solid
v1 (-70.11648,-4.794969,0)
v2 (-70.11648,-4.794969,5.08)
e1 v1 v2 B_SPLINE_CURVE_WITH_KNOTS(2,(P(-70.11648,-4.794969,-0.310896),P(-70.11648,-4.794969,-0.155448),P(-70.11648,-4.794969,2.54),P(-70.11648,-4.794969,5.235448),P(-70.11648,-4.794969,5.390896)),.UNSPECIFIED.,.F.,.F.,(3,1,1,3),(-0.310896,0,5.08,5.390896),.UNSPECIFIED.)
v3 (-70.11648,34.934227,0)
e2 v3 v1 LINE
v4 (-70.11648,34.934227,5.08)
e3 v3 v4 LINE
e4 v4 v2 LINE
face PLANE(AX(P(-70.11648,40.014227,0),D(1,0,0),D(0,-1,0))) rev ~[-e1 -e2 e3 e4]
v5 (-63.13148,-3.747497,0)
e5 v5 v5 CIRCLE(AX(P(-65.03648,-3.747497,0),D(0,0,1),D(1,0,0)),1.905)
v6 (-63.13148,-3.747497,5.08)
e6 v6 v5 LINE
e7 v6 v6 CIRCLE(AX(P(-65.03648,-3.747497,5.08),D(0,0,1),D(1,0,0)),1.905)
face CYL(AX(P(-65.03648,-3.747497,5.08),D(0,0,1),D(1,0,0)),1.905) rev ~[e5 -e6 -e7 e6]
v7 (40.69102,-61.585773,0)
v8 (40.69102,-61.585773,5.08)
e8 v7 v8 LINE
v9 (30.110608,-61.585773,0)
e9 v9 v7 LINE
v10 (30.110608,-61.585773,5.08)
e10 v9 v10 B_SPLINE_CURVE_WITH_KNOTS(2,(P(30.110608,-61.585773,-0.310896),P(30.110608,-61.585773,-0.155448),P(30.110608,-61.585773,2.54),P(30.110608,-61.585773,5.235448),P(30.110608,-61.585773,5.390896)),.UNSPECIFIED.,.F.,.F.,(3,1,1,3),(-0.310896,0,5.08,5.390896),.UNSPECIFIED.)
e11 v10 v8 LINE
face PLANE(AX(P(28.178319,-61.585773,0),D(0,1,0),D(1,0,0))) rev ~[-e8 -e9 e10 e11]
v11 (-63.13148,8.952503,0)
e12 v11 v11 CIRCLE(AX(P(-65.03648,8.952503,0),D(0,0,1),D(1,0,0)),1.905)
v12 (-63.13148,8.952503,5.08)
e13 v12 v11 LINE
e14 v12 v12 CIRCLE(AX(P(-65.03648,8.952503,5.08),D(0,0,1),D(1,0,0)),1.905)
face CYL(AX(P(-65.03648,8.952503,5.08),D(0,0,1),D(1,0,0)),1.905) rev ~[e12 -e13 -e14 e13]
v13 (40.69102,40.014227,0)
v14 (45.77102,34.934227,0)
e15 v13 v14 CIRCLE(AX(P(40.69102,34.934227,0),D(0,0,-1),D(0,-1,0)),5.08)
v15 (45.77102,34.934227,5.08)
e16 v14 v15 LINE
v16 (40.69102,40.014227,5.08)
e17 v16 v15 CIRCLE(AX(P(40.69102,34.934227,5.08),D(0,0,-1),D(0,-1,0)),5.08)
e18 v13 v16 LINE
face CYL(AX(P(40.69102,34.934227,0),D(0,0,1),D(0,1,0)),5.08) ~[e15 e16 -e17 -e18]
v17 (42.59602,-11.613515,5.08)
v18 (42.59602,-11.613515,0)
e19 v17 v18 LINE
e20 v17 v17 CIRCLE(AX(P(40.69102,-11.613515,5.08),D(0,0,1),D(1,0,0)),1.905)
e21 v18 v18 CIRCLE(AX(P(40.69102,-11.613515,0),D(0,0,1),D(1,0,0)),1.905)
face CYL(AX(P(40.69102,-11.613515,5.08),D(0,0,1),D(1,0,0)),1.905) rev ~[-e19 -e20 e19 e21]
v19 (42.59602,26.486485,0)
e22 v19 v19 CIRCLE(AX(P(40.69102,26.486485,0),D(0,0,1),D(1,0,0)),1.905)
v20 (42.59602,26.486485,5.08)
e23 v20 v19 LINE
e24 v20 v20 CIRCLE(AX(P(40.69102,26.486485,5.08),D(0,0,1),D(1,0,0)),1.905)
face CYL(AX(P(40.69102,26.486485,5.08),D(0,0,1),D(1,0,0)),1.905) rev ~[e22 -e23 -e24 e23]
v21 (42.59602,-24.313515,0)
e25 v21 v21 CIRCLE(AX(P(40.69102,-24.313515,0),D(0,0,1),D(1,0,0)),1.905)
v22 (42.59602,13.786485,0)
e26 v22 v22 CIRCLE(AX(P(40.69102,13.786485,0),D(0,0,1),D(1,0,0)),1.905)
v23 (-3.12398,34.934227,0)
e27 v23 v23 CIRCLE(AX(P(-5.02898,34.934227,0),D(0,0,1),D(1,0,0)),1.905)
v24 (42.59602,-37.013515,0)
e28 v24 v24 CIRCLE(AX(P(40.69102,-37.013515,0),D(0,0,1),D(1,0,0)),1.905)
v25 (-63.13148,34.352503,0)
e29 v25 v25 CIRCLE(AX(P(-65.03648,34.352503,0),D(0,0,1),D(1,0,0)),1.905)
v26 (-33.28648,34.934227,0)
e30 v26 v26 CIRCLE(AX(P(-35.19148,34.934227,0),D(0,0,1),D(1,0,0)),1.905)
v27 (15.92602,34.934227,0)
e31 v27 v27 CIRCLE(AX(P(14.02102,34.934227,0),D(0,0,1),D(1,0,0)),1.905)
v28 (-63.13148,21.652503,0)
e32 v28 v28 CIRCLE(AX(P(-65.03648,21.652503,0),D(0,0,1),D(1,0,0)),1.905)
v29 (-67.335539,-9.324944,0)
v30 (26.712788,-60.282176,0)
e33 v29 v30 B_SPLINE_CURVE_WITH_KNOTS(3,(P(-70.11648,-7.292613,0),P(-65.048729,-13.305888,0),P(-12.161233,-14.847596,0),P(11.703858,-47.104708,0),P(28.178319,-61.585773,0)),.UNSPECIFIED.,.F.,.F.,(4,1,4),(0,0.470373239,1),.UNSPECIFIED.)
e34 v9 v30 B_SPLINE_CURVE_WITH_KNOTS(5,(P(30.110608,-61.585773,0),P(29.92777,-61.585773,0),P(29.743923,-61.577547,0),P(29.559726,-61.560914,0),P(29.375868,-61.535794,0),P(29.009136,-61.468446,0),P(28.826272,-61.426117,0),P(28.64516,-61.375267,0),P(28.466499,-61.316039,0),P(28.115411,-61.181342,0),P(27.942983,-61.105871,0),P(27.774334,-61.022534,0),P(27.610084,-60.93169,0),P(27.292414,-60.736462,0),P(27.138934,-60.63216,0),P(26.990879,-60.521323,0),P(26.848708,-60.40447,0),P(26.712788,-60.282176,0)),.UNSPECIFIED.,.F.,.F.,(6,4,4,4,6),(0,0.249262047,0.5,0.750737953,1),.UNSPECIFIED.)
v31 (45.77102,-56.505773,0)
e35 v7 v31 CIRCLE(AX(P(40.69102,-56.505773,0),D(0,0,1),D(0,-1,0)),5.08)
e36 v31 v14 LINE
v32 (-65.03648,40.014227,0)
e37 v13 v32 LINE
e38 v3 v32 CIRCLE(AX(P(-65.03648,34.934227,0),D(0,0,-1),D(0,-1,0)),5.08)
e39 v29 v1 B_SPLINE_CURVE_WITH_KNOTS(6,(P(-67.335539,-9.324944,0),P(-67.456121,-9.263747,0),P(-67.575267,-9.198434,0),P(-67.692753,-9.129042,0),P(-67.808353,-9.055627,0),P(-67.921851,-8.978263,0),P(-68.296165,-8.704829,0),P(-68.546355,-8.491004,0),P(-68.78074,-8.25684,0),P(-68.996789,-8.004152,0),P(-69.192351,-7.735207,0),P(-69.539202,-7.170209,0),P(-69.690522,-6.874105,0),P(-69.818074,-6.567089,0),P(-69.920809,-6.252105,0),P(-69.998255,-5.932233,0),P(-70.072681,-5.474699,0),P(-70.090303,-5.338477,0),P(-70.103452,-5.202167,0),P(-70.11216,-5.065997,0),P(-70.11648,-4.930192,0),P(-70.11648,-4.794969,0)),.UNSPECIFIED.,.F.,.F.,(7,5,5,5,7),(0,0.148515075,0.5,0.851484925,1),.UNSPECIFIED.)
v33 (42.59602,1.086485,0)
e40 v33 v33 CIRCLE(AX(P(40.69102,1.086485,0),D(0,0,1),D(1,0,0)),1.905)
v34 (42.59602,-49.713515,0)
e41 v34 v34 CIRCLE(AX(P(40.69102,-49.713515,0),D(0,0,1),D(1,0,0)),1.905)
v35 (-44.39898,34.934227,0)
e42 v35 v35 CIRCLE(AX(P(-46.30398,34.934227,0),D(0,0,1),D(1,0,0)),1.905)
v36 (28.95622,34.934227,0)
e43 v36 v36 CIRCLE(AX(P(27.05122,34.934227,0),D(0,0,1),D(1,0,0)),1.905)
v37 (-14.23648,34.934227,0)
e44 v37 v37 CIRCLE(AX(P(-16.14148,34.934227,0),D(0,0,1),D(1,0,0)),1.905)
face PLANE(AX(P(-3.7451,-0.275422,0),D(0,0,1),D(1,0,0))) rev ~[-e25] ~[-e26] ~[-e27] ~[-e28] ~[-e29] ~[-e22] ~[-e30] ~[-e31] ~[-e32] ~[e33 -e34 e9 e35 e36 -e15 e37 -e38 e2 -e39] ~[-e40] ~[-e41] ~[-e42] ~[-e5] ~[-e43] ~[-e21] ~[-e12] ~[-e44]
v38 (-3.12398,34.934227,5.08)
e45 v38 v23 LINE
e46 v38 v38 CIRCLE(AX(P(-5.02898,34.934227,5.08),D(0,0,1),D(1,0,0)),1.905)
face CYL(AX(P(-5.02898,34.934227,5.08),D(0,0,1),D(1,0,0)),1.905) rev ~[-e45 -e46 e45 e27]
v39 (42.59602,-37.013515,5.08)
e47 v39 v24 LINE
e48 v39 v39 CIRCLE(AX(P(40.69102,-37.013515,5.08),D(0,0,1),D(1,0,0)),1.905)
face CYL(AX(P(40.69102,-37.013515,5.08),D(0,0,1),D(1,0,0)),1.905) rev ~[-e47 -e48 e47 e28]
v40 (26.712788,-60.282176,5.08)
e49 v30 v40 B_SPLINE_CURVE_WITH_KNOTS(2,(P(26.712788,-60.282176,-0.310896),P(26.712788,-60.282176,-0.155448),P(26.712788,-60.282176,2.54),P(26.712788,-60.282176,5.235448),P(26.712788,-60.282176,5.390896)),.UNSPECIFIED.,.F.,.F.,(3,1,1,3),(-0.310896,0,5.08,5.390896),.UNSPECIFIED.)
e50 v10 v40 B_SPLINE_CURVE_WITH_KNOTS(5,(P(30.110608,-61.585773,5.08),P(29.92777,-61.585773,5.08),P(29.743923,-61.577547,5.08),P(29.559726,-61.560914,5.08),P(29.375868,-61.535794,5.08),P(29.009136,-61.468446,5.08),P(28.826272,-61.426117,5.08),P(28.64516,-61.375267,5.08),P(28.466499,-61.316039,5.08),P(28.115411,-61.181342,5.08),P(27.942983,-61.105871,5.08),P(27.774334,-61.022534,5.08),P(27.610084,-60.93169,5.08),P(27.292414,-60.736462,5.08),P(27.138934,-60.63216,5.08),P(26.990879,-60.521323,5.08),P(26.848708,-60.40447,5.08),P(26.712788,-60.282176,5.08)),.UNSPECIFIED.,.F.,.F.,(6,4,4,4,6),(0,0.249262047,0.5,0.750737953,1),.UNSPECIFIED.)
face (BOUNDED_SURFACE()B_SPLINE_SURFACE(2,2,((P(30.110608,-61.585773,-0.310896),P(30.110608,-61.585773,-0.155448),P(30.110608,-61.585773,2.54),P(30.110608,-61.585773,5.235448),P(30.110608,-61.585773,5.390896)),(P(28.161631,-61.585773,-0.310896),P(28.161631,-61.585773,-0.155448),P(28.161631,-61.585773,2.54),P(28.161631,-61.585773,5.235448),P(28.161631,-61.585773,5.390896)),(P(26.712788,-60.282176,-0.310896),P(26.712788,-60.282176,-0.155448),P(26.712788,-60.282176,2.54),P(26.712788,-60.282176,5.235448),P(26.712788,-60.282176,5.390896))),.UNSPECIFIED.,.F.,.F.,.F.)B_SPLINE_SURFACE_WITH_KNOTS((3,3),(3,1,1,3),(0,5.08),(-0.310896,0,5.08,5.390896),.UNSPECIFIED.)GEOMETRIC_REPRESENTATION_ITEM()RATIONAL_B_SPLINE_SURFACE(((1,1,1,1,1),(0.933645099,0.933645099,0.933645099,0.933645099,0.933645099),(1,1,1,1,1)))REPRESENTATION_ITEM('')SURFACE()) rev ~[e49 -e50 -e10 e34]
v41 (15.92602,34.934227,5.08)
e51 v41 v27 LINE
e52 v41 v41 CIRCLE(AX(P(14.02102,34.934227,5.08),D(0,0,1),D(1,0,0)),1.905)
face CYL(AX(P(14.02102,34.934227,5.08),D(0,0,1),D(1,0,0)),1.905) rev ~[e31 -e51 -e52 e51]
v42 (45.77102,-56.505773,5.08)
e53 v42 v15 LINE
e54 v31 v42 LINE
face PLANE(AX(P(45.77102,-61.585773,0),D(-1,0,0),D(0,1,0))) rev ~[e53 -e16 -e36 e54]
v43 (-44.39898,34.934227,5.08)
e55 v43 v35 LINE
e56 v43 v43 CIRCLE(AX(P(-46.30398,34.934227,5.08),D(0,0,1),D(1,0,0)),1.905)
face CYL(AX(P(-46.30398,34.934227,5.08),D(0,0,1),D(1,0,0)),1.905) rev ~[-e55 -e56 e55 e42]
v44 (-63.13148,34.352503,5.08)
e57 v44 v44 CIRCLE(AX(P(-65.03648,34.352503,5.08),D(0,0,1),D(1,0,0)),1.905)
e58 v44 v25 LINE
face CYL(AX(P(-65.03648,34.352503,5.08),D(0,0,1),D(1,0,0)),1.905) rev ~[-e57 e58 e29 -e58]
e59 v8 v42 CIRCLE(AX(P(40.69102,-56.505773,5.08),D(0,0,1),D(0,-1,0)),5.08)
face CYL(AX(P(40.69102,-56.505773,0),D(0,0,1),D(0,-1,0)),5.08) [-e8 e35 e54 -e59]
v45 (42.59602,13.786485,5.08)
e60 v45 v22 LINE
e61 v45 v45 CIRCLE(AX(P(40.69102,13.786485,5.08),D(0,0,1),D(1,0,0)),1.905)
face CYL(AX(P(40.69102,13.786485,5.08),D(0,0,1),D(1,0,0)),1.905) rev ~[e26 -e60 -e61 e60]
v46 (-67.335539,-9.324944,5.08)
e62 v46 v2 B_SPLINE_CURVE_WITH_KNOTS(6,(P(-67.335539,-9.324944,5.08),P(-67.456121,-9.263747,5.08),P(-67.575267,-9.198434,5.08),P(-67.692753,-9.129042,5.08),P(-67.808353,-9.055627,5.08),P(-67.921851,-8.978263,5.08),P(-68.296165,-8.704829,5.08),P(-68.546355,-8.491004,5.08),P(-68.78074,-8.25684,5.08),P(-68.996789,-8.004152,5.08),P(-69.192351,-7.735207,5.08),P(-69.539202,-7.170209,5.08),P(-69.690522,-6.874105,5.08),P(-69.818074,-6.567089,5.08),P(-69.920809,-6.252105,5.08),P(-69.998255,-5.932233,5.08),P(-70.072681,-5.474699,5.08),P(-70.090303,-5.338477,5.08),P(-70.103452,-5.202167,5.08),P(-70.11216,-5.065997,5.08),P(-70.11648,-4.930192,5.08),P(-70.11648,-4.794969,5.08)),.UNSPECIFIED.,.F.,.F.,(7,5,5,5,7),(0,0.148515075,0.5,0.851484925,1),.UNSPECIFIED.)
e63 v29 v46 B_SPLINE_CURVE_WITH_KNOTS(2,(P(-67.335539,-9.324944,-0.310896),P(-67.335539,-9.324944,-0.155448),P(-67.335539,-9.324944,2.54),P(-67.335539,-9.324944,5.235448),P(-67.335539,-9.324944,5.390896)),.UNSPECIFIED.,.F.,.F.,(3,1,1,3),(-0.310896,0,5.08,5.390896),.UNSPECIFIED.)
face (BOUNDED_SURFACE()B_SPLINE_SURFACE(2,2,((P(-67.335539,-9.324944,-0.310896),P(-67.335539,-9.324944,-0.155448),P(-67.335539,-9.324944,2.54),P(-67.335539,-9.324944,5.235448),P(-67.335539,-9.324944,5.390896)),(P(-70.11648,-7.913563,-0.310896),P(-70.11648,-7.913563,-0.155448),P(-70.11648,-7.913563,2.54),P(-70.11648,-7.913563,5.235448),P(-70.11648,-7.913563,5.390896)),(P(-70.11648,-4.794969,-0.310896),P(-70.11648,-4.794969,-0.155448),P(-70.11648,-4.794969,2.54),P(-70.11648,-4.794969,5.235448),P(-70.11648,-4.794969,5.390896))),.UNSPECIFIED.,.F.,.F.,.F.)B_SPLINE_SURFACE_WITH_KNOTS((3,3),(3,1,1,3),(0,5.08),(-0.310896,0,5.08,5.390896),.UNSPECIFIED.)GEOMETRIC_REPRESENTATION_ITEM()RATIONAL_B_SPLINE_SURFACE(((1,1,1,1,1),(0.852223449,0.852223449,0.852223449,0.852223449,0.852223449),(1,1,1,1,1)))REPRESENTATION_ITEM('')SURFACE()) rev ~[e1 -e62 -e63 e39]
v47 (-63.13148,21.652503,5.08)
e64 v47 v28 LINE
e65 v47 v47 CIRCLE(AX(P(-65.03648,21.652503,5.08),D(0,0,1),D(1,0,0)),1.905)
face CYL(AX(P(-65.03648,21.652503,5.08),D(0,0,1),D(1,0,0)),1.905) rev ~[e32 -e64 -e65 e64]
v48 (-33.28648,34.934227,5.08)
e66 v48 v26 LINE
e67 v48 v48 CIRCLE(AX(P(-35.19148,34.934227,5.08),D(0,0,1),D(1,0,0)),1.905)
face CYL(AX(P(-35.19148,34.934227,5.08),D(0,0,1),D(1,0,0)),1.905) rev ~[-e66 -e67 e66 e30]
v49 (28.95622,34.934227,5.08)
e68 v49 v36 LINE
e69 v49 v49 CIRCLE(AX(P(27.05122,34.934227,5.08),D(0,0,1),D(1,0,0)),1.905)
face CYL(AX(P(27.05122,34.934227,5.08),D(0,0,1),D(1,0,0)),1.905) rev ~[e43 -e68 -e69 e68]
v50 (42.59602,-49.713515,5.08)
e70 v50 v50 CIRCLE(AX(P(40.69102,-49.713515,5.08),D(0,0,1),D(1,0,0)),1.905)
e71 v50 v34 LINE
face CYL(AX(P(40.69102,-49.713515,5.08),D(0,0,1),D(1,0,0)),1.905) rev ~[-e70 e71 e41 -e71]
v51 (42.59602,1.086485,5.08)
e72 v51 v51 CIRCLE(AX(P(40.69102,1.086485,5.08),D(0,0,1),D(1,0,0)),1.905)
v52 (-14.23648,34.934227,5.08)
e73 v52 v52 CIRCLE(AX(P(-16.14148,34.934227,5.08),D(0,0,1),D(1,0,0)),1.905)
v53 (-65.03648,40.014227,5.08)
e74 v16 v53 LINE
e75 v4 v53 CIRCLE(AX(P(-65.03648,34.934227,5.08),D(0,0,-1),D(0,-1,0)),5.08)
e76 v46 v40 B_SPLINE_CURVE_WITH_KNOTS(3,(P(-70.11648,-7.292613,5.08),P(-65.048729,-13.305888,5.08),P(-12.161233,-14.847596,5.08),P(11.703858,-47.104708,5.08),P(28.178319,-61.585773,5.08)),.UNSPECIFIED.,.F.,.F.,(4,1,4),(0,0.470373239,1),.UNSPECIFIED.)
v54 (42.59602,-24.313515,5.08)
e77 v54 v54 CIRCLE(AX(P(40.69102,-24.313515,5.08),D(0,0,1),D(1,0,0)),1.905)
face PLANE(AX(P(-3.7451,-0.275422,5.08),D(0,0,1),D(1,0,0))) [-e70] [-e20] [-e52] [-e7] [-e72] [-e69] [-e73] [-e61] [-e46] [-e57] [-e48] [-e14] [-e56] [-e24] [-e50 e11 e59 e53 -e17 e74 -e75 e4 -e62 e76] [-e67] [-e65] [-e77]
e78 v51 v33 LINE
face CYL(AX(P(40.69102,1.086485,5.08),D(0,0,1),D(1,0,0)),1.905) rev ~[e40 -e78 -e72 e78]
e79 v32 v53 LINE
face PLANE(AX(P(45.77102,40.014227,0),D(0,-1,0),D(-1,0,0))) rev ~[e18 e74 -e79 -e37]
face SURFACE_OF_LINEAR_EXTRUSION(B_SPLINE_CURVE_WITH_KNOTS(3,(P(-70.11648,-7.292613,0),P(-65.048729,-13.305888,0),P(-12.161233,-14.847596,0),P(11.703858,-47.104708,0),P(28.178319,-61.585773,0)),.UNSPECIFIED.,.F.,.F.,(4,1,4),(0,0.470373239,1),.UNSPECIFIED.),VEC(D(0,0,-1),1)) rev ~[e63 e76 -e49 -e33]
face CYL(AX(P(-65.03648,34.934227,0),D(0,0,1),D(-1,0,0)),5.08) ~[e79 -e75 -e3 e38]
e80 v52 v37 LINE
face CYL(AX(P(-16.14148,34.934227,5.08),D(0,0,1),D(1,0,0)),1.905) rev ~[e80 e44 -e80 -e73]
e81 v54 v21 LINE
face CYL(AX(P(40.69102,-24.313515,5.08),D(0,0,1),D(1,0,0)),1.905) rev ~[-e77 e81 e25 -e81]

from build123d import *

# Parameters (mm, degrees)
F1_DEPTH = 5.08
F2_R     = 5.08
F2_R_2   = 5.07999
F3_R     = 1.905
F4_DEPTH = 5.0810001


# Not quite as in the source:
# - a fillet or chamfer is up to 0.001 mm smaller than in the source, because OpenCascade refuses the exact size


with BuildPart() as f1:
    # F0 (on Top) → F1 (new body)
    with BuildSketch(Plane.XY):
        with BuildLine():
            Line((-70.1164795637, 40.014226675), (-70.1164795637, -7.2926129862))
            add(Edge.make_bspline(
                [(-70.1164795637, -7.2926129862), (-65.04872861, -13.3058879533), (-12.1612328693, -14.8475963345), (11.7038576667, -47.1047081721), (28.178319335, -61.585773325)],
                knots=[0, 0, 0, 0, 0.4703732395, 1, 1, 1, 1], degree=3))
            Line((28.178319335, -61.585773325), (45.7710204363, -61.585773325))
            Line((45.7710204363, -61.585773325), (45.7710204363, 40.014226675))
            Line((45.7710204363, 40.014226675), (-70.1164795637, 40.014226675))
        make_face()
    extrude(amount=F1_DEPTH)

    # F2 (call 1 of 5: OpenCascade refuses the feature's edges together)
    f2_edges = [f1.edges().sort_by_distance(p)[0] for p in [
        (-70.11648, 40.014227, 2.54),
    ]]
    fillet(f2_edges, radius=F2_R)

    # F2#2 (call 2 of 5)
    f2_2_edges = [f1.edges().sort_by_distance(p)[0] for p in [
        (45.77102, 40.014227, 2.54),
    ]]
    fillet(f2_2_edges, radius=F2_R)

    # F2#4 (call 3 of 5)
    f2_4_edges = [f1.edges().sort_by_distance(p)[0] for p in [
        (28.178319, -61.585773, 2.54),
    ]]
    fillet(f2_4_edges, radius=F2_R)

    # F2#5 (call 4 of 5)
    f2_5_edges = [f1.edges().sort_by_distance(p)[0] for p in [
        (45.77102, -61.585773, 2.54),
    ]]
    fillet(f2_5_edges, radius=F2_R)

    # F2#3 (call 5 of 5) (radius 5.08 in the source; OpenCascade refuses exactly that, so slightly less here)
    f2_3_edges = [f1.edges().sort_by_distance(p)[0] for p in [
        (-70.11648, -7.292613, 2.54),
    ]]
    fillet(f2_3_edges, radius=F2_R_2)

    # F3 (on face) → F4 (cut, through all)
    with BuildSketch(Plane.XY.offset(5.08)):
        with Locations((-46.3039795637, 34.934226675)):
            Circle(F3_R)
        with Locations((-35.1914795637, 34.934226675)):
            Circle(F3_R)
        with Locations((-16.1414795637, 34.934226675)):
            Circle(F3_R)
        with Locations((-5.0289795637, 34.934226675)):
            Circle(F3_R)
        with Locations((14.0210204363, 34.934226675)):
            Circle(F3_R)
        with Locations((-65.0364795637, 34.3525031737)):
            Circle(F3_R)
        with Locations((-65.0364795637, 21.6525031737)):
            Circle(F3_R)
        with Locations((-65.0364795637, 8.9525031737)):
            Circle(F3_R)
        with Locations((-65.0364795637, -3.7474968263)):
            Circle(F3_R)
        with Locations((27.0512204363, 34.934226675)):
            Circle(F3_R)
        with Locations((40.6910204363, 26.4864852548)):
            Circle(F3_R)
        with Locations((40.6910204363, 13.7864852548)):
            Circle(F3_R)
        with Locations((40.6910204363, 1.0864852548)):
            Circle(F3_R)
        with Locations((40.6910204363, -11.6135147452)):
            Circle(F3_R)
        with Locations((40.6910204363, -24.3135147452)):
            Circle(F3_R)
        with Locations((40.6910204363, -37.0135147452)):
            Circle(F3_R)
        with Locations((40.6910204363, -49.7135147452)):
            Circle(F3_R)
    extrude(amount=-F4_DEPTH, mode=Mode.SUBTRACT)


solid = f1.part
